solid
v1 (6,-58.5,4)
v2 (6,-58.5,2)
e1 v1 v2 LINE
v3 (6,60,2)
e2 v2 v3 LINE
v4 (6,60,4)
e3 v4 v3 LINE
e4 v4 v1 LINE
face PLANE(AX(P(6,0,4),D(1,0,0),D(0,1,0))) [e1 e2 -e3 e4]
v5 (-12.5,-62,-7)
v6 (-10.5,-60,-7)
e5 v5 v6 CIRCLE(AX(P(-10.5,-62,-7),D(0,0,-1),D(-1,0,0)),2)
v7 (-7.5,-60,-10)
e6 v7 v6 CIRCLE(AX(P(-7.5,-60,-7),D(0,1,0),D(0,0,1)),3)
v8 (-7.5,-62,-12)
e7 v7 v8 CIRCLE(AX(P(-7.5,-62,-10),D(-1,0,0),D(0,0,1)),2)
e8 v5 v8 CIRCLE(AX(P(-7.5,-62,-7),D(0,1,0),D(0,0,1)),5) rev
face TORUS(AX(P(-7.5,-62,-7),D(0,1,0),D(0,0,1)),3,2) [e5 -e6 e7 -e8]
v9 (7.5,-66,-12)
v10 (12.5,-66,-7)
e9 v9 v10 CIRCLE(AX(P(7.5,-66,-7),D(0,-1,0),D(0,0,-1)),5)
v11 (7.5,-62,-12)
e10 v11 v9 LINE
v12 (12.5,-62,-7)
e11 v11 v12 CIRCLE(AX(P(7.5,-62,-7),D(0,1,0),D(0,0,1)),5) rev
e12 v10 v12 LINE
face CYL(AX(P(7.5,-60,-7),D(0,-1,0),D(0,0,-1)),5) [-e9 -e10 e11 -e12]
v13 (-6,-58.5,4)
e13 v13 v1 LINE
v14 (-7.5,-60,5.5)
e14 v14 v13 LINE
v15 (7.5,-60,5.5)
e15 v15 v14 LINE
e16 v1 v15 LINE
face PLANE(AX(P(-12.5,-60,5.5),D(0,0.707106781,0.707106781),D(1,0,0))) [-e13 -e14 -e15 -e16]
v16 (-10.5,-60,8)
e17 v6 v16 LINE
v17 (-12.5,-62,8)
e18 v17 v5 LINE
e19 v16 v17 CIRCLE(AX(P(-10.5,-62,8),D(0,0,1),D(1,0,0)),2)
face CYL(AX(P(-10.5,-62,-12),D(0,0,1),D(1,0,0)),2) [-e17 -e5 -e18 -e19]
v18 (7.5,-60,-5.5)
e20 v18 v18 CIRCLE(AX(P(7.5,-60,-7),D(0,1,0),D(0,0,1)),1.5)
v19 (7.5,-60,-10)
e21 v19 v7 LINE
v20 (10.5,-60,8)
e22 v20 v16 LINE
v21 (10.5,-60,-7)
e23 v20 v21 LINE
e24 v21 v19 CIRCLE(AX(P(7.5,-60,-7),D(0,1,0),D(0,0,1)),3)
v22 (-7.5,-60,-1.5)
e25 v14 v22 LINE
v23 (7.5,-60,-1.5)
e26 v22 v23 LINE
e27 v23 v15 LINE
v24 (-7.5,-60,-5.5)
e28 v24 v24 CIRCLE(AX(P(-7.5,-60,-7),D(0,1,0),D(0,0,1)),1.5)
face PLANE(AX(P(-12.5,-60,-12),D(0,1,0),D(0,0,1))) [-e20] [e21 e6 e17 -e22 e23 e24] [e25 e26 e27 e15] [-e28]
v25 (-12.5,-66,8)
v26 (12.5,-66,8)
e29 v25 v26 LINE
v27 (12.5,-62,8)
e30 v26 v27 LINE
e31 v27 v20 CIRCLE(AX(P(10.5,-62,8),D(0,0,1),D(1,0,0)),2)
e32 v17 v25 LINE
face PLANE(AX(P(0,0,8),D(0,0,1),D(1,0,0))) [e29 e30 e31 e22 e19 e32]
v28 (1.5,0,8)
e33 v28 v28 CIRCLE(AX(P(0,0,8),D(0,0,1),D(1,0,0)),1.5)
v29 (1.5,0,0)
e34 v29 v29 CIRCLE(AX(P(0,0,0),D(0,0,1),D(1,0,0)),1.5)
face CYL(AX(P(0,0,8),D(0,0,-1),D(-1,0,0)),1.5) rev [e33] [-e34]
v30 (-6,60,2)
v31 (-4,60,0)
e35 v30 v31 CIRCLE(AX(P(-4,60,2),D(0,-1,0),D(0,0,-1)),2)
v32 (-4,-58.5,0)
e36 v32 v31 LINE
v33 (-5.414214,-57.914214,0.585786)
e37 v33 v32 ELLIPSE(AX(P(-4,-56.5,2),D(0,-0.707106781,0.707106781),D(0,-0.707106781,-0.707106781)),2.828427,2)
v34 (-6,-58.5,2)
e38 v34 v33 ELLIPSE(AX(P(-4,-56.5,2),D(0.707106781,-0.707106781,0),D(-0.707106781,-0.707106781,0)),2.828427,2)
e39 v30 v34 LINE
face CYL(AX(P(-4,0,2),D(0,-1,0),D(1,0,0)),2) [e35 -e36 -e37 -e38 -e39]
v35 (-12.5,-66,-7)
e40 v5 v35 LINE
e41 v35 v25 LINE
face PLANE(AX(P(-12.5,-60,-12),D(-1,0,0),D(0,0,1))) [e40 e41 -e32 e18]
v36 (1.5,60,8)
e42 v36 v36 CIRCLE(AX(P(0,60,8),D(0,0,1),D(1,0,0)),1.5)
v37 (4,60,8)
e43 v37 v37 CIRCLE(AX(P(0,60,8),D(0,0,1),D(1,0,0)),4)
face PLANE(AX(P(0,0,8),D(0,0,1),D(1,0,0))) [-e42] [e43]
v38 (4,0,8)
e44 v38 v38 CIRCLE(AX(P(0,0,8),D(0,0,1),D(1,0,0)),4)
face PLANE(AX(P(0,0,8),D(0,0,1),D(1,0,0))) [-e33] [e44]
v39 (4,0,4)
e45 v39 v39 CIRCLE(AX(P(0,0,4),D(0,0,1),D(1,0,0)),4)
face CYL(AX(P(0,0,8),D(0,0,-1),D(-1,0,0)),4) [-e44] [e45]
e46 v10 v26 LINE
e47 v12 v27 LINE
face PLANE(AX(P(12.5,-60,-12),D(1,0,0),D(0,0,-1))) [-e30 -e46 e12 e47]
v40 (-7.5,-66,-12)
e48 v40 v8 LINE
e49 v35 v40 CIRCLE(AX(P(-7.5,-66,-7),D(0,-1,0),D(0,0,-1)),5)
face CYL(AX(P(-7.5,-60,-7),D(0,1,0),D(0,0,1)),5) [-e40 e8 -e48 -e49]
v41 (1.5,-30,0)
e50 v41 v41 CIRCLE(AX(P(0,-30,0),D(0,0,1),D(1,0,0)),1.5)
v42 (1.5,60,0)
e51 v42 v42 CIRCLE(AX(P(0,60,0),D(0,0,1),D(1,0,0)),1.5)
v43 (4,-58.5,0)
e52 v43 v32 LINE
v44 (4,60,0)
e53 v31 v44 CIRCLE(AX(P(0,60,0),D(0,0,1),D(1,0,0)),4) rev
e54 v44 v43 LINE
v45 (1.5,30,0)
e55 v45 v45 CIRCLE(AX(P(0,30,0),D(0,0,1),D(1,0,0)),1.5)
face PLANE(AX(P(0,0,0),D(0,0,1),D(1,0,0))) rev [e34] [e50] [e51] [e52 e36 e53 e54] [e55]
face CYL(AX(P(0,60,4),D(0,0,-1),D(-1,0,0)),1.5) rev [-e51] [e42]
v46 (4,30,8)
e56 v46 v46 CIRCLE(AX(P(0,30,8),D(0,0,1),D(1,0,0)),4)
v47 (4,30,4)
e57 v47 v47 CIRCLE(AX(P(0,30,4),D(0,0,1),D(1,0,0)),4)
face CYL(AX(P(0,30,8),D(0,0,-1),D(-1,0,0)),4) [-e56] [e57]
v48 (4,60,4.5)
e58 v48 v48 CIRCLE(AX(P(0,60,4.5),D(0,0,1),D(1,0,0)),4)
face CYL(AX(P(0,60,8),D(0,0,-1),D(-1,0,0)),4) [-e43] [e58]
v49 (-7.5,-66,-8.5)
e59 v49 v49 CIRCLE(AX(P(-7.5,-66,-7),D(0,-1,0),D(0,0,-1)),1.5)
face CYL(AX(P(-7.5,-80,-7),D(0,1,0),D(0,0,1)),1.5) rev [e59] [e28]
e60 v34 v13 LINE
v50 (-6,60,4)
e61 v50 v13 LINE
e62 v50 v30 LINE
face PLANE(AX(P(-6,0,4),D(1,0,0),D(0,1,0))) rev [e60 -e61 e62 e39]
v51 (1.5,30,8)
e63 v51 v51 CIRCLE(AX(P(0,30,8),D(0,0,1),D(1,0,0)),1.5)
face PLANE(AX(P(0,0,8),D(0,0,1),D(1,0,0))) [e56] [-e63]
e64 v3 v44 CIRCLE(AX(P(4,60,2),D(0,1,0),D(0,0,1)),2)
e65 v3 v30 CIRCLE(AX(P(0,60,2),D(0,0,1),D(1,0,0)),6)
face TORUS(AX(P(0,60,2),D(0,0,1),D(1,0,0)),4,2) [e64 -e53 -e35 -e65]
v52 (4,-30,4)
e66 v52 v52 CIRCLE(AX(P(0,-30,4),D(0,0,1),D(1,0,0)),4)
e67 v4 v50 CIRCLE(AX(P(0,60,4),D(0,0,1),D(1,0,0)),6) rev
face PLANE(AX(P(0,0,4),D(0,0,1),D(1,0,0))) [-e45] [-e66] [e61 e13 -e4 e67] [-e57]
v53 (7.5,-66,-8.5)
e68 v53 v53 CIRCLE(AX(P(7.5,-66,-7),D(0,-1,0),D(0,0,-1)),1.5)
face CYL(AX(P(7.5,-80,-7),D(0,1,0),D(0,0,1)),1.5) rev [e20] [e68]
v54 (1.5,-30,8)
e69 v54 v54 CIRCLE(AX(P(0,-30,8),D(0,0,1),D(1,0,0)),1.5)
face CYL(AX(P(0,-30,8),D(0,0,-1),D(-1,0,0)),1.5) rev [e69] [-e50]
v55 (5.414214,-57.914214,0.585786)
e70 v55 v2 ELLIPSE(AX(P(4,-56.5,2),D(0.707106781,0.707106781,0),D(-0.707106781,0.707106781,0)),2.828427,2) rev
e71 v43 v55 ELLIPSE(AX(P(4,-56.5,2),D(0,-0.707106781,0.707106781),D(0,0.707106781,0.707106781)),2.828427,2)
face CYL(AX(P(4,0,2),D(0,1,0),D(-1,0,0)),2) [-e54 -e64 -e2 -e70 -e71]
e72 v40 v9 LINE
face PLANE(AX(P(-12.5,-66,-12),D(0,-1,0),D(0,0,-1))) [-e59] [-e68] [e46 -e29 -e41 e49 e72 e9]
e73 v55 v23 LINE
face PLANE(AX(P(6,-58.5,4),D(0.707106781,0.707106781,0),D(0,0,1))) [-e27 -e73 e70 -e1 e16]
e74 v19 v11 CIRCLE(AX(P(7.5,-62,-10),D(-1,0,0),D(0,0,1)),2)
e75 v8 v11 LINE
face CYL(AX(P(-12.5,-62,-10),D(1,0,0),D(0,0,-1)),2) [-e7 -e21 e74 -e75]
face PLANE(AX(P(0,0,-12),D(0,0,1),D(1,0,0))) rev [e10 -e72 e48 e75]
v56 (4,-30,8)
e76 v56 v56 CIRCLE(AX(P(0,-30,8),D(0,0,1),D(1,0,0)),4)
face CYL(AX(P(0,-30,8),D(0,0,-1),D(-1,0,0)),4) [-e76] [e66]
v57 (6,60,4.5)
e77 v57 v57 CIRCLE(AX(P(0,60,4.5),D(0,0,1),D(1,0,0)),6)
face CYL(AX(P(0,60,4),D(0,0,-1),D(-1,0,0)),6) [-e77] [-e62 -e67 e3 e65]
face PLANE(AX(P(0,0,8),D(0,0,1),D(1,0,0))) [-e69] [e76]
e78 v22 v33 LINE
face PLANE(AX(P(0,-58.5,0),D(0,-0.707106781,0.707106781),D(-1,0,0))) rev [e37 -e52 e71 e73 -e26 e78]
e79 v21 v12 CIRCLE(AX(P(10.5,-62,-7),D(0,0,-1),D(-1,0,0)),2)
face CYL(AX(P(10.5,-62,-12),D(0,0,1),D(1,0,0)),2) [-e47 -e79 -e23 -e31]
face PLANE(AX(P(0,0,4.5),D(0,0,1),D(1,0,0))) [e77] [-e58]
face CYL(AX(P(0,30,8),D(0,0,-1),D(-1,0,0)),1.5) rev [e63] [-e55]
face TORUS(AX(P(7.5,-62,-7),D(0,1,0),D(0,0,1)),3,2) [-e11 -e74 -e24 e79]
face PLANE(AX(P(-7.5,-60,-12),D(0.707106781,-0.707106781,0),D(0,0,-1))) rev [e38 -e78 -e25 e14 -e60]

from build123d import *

# Parameters (mm, degrees)
SKETCH_1_R          = 4
SKETCH_1_R_2        = 1.5
EXTRUDE_1_DEPTH     = 4
SKETCH_1_4_R        = 4
SKETCH_1_4_R_2      = 1.5
EXTRUDE_3_DEPTH     = 8
SKETCH_1_5_R        = 4
EXTRUDE_4_DEPTH     = 4.5
SKETCH_2_W          = 25
SKETCH_2_H          = 6
EXTRUDE_5_DEPTH     = 20
CHAMFER_1_SIZE      = 1.5
FILLET_1_R          = 2
FILLET_2_R          = 5
FILLET_4_R          = 2
SKETCH_3_R          = 1.5
CUT_EXTRUDE_1_DEPTH = 20


with BuildPart() as part:
    # 草图1 → 凸台-拉伸1 (new body)
    with BuildSketch(Plane.XY):
        with BuildLine():
            ThreePointArc((6, 60), (0, 66), (-6, 60))
            Line((-6, 60), (-6, -60))
            ThreePointArc((-6, -60), (0, -66), (6, -60))
            Line((6, -60), (6, 60))
        make_face()
        with Locations((0, 30)):
            Circle(SKETCH_1_R, mode=Mode.SUBTRACT)
        Circle(SKETCH_1_R, mode=Mode.SUBTRACT)
        with Locations((0, -30)):
            Circle(SKETCH_1_R, mode=Mode.SUBTRACT)
        with Locations((0, 60)):
            Circle(SKETCH_1_R_2, mode=Mode.SUBTRACT)
    extrude(amount=EXTRUDE_1_DEPTH)

    # 草图1<4> → 凸台-拉伸3 (add)
    # profile 1 of 4: a face of its own
    with BuildSketch(Plane.XY):
        with Locations((0, 60)):
            Circle(SKETCH_1_4_R)
        with Locations((0, 60)):
            Circle(SKETCH_1_4_R_2, mode=Mode.SUBTRACT)
    # profile 2 of 4: a face of its own
    with BuildSketch(Plane.XY):
        with Locations((0, -30)):
            Circle(SKETCH_1_4_R)
        with Locations((0, -30)):
            Circle(SKETCH_1_4_R_2, mode=Mode.SUBTRACT)
    # profile 3 of 4: a face of its own
    with BuildSketch(Plane.XY):
        Circle(SKETCH_1_4_R)
        Circle(SKETCH_1_4_R_2, mode=Mode.SUBTRACT)
    # profile 4 of 4: a face of its own
    with BuildSketch(Plane.XY):
        with Locations((0, 30)):
            Circle(SKETCH_1_4_R)
        with Locations((0, 30)):
            Circle(SKETCH_1_4_R_2, mode=Mode.SUBTRACT)
    extrude(amount=EXTRUDE_3_DEPTH)

    # 草图1<5> → 凸台-拉伸4 (add)
    with BuildSketch(Plane.XY):
        with BuildLine():
            ThreePointArc((-6, 60), (0, 54), (6, 60))
            ThreePointArc((6, 60), (0, 66), (-6, 60))
        make_face()
        with Locations((0, 60)):
            Circle(SKETCH_1_5_R, mode=Mode.SUBTRACT)
    extrude(amount=EXTRUDE_4_DEPTH)

    # 草图2 → 凸台-拉伸5 (add)
    with BuildSketch(Plane.XY.offset(8)):
        with Locations((0, -63)):
            Rectangle(SKETCH_2_W, SKETCH_2_H)
    extrude(amount=-EXTRUDE_5_DEPTH)

    # 倒角1
    chamfer_1_edges = [part.edges().sort_by_distance(p)[0] for p in [
        (0, -60, 0),
        (-6, -60, 2),
        (0, -60, 4),
        (6, -60, 2),
    ]]
    chamfer(chamfer_1_edges, length=CHAMFER_1_SIZE)

    # 圆角1
    fillet_1_edges = [part.edges().sort_by_distance(p)[0] for p in [
        (-6, 0.75, 0),
        (0, 66, 0),
        (6, 0.75, 0),
    ]]
    fillet(fillet_1_edges, radius=FILLET_1_R)

    # 圆角2
    fillet_2_edges = [part.edges().sort_by_distance(p)[0] for p in [
        (-12.5, -63, -12),
        (12.5, -63, -12),
    ]]
    fillet(fillet_2_edges, radius=FILLET_2_R)

    # 圆角4
    fillet_4_edges = [part.edges().sort_by_distance(p)[0] for p in [
        (-11.035533906, -60, -10.535533906),
        (-12.5, -60, 0.5),
        (0, -60, -12),
        (11.035533906, -60, -10.535533906),
        (12.5, -60, 0.5),
    ]]
    fillet(fillet_4_edges, radius=FILLET_4_R)

    # 草图3 → 切除-拉伸1 (cut)
    with BuildSketch(Plane(origin=(0, -60, 0), x_dir=(1, 0, 0), z_dir=(0, 1, 0))):
        with Locations((-7.5, 7)):
            Circle(SKETCH_3_R)
        with Locations((7.5, 7)):
            Circle(SKETCH_3_R)
    extrude(amount=-CUT_EXTRUDE_1_DEPTH, mode=Mode.SUBTRACT)


solid = part.part
